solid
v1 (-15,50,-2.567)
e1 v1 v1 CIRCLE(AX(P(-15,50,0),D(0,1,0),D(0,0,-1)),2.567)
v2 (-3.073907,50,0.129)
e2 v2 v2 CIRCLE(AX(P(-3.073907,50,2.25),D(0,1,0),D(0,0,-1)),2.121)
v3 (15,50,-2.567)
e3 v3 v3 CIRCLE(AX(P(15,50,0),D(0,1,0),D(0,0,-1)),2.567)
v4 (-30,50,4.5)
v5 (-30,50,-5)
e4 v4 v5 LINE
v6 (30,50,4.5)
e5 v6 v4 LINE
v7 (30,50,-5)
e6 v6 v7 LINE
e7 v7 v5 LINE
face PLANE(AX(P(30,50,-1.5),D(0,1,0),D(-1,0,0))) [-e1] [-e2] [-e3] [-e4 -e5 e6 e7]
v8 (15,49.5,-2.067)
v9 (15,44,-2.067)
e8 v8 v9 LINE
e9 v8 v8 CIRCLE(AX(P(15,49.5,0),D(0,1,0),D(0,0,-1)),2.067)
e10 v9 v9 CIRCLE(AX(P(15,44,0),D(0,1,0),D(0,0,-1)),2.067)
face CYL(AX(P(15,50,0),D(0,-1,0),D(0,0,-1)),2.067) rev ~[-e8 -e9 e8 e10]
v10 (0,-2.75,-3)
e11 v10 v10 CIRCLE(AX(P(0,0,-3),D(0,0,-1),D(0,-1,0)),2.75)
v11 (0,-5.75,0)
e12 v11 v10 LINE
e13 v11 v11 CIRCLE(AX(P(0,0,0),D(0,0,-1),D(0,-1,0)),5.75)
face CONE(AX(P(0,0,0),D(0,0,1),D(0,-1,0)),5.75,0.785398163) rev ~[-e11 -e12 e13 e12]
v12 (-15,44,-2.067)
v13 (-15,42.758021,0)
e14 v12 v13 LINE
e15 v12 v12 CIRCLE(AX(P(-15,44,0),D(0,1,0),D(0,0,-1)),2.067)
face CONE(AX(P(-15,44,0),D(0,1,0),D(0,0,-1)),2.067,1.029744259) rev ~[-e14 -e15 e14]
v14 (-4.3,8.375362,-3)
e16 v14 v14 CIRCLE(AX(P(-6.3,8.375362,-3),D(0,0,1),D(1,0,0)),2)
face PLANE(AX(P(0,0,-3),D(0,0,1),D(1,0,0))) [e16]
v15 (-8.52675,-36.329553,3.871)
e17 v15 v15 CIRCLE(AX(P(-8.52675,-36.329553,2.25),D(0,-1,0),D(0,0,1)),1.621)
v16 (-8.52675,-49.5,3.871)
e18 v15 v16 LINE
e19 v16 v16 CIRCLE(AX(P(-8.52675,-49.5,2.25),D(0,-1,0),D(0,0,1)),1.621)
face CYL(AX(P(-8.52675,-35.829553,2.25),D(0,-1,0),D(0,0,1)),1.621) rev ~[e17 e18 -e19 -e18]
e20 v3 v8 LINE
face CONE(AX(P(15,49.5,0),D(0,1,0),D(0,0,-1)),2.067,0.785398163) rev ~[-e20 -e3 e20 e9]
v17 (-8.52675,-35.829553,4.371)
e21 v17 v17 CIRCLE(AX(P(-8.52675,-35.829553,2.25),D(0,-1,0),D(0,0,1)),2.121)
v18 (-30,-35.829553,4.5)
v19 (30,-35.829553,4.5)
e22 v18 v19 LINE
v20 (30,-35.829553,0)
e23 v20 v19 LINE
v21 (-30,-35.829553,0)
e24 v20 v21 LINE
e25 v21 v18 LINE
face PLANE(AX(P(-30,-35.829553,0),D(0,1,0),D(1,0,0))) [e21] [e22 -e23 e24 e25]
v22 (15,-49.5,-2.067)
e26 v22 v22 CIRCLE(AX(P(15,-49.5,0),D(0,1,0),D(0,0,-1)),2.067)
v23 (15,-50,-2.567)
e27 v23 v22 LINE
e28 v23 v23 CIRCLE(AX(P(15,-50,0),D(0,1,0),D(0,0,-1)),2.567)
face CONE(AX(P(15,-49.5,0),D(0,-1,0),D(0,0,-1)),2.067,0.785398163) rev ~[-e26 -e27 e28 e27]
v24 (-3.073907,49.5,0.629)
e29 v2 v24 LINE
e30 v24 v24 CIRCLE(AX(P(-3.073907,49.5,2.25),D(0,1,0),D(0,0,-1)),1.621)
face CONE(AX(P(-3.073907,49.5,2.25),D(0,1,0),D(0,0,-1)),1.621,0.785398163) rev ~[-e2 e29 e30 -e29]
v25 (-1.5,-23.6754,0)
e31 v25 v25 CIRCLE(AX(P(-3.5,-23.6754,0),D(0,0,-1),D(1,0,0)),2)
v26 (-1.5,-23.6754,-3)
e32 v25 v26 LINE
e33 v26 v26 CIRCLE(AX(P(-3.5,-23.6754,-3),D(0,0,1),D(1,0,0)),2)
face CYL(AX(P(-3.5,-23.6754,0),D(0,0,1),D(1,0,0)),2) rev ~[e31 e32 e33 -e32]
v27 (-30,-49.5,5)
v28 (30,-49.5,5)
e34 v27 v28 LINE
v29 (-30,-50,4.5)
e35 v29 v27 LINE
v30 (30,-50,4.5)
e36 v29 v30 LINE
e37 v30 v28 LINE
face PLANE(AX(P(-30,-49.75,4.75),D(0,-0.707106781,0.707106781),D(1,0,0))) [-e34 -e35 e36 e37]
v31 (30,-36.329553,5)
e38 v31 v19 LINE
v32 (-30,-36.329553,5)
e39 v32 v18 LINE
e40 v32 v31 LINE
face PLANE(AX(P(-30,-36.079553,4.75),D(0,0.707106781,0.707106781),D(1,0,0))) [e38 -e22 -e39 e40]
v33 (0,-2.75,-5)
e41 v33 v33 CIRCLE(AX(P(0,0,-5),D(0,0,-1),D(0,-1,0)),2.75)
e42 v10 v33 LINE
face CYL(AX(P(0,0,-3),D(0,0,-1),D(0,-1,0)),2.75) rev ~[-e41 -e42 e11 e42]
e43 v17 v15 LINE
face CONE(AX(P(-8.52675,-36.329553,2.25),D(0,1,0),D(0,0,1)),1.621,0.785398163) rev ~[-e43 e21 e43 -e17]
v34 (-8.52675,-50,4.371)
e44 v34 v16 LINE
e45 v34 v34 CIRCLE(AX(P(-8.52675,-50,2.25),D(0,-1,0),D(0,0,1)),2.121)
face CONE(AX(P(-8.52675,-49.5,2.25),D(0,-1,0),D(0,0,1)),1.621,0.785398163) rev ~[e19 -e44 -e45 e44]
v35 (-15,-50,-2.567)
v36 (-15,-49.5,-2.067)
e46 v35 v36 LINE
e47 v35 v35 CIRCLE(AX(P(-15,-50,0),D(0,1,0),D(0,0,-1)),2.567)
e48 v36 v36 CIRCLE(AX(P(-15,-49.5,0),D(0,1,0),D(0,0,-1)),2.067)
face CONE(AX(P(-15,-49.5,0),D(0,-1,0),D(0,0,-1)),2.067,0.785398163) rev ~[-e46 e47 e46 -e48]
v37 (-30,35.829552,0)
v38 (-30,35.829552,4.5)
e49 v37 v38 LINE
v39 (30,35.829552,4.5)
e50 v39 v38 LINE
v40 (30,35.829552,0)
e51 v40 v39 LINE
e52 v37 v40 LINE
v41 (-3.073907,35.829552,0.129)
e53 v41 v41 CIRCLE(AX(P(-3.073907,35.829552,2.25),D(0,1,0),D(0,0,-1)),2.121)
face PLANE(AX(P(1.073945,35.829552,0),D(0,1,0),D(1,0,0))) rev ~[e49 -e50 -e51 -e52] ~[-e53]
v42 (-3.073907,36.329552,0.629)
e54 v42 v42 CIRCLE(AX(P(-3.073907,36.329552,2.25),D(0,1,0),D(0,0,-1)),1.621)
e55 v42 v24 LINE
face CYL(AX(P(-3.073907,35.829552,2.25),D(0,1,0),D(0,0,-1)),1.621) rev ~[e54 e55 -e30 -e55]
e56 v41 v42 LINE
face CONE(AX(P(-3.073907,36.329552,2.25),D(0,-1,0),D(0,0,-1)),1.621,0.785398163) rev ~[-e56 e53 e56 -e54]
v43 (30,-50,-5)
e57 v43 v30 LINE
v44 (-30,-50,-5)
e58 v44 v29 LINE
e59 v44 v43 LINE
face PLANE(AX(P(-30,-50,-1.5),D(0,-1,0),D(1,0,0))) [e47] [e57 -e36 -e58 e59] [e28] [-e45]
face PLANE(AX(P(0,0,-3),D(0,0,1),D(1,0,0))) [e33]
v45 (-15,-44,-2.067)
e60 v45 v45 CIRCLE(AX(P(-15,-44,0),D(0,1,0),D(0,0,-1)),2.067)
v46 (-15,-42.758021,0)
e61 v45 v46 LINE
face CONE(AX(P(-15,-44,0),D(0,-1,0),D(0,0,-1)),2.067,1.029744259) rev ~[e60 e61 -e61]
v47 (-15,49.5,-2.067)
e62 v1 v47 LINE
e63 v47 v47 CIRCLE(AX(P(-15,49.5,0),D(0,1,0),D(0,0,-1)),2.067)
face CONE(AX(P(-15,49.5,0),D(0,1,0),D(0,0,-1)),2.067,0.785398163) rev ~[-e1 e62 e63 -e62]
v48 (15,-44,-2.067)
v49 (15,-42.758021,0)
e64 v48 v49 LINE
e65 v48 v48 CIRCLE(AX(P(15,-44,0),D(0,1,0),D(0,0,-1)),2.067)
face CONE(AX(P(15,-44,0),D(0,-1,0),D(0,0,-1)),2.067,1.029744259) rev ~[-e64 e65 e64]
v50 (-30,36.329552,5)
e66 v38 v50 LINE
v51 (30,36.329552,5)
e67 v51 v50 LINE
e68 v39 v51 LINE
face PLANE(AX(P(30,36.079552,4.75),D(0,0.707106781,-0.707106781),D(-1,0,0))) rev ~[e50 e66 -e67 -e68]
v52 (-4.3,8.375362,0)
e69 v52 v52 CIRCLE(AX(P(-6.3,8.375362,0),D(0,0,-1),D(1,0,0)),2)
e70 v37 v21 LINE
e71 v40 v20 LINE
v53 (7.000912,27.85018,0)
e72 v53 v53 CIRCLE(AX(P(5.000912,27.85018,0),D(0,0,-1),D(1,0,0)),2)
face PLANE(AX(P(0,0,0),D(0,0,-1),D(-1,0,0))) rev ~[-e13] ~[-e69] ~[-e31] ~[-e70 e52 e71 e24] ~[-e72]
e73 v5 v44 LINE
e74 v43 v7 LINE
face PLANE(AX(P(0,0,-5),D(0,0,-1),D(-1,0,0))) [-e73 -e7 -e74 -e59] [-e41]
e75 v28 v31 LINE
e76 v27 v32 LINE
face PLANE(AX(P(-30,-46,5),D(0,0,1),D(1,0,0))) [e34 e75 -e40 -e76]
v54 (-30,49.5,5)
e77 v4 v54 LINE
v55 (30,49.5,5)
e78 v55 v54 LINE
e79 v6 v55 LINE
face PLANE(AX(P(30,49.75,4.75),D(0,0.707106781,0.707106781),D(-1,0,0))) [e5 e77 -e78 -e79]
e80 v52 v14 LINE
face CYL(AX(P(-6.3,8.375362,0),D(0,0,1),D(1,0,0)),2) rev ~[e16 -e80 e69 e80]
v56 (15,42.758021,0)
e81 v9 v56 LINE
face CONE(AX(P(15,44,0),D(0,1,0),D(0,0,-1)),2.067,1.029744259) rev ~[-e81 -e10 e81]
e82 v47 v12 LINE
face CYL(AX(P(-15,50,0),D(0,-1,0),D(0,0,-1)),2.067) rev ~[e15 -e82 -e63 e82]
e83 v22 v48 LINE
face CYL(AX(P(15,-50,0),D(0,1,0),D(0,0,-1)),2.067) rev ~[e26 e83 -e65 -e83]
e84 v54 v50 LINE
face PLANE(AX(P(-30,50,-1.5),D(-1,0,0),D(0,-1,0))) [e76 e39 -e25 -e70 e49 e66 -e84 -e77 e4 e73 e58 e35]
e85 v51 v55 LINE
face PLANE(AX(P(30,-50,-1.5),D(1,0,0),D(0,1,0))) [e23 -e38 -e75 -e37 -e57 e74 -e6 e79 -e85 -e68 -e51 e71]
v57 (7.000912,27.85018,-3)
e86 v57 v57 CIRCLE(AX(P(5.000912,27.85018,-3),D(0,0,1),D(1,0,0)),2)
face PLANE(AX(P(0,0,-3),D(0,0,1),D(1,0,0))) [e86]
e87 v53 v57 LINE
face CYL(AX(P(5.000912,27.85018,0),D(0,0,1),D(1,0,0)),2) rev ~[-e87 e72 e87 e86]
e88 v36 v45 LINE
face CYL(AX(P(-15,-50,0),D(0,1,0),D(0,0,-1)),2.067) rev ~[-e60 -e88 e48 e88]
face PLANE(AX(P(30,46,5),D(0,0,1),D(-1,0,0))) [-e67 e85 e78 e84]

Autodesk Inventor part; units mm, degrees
ref_plane "YZ Plane" through (0, 0, 0) normal (1, 0, 0) x (0, 1, 0)
ref_plane "XZ Plane" through (0, 0, 0) normal (0, 1, 0) x (-1, 0, 0)
ref_plane "XY Plane" through (0, 0, 0) normal (0, 0, 1) x (1, 0, 0)
sketch "Skizze1" plane through (0, 0, 0) normal (0, 0, 1) x (1, 0, 0)
  arc A0 (-7.910725, 24.207043) -> (-7.910891, 20.407043) centre (-6.063513, 22.306962) ccw
  line L0 (-7.910725, 24.207043) -> (-4.216135, 24.206882)
  arc A1 (-4.216301, 20.406882) -> (-4.216135, 24.206882) centre (-6.063513, 22.306962) ccw
  line L1 (-4.216301, 20.406882) -> (-7.910891, 20.407043)
  spline S0 degree 3 poles (4.168227, 35.189684) (1.190462, 36.459804) (-2.249662, 35.164227) (-6.254955, 34.158153) (-11.73606, 32.147863) (-17.267484, 27.437) (-17.397864, 22.280527) (-19.179409, 11.837341) (-24.204265, -4.219772) (-21.912215, -21.361857) (-15.72629, -32.136108) (-8.960071, -34.873142) (-7.734356, -35.206805) knots 0 0 0 0 0.05534958 0.07652777 0.21178189 0.29554676 0.38296386 0.43292215 0.75488434 0.81234043 0.96723776 1 1 1 1
  spline S1 degree 3 poles (-7.734356, -35.206805) (-2.439109, -36.648242) (4.93418, -35.14496) (14.388893, -31.364077) (20.220621, -28.276552) (23.084745, -23.179223) (23.280953, -18.995872) (17.306215, -16.499664) (13.73981, -19.293705) (6.907357, -22.933236) (-1.198572, -27.162074) (-10.305482, -22.9326) (-14.035245, -10.40017) (-9.459871, -0.926027) (-6.833349, 0.315314) (-5.918232, 2.05884) (-5.936684, 4.17913) (-8.288714, 5.230646) (-8.364147, 10.437319) (-1.010592, 14.125066) (4.082108, 20.05073) (3.063503, 26.302613) (2.949283, 28.613576) (3.78883, 29.833993) (5.577793, 31.092404) (6.613193, 32.774527) (5.245759, 34.708646) (4.265654, 35.148112) (4.168227, 35.189684) knots 0 0 0 0 0.1415298 0.17035016 0.24598676 0.2589199 0.29022703 0.32626485 0.37223258 0.38897966 0.48209608 0.50825566 0.62441589 0.64741797 0.71527435 0.72606992 0.74689162 0.80172241 0.81188461 0.84851364 0.9163561 0.94337427 0.94821885 0.96295932 0.96650966 0.98187972 0.99818797 1 1 1 1
  line L2 (-4.216301, 20.406882) -> (-7.910891, 20.407043)
  arc A2 (-4.216301, 20.406882) -> (-4.216135, 24.206882) centre (-6.063513, 22.306962) ccw
  line L3 (-7.910725, 24.207043) -> (-4.216135, 24.206882)
  arc A3 (-7.910725, 24.207043) -> (-7.910891, 20.407043) centre (-6.063513, 22.306962) ccw
  line L4 (-22.994876, 35.829551) -> (22.994876, 35.829551) construction
  line L5 (22.994876, 35.829551) -> (22.994876, -35.829551) construction
  line L6 (22.994876, -35.829551) -> (-22.994876, -35.829551) construction
  line L7 (-22.994876, -35.829551) -> (-22.994876, 35.829551) construction
  line L8 (-22.994876, 35.829551) -> (22.994876, -35.829551) construction
  line L9 (-22.994876, -35.829551) -> (22.994876, 35.829551) construction
  circle A4 centre (3.874552, -36.279551) radius 1.25 construction
  line L10 (1.214575, -35.829551) -> (11.587679, -35.829551) construction
  line L11 (3.874552, -36.279551) -> (3.874552, -35.029551) construction
  circle A5 centre (4.795469, 36.279551) radius 1.25 construction
  line L12 (4.795469, 36.279551) -> (4.795469, 35.029551) construction
  line L13 (3.124047, 35.829551) -> (12.547009, 35.829551) construction
  point P0 (0, 0)
  point P1 (0, 0)
  point P2 (0, 0)
  dimension "d88" = 2.5
  dimension "d91" = 2.5
  dimension "d89" = 0.8
  dimension "d92" = 0.8
sketch "Skizze9" plane through (0, 0, 0) normal (0, 0, 1) x (1, 0, 0)
  line L0 (-30, 46) -> (30, 46)
  line L1 (30, 46) -> (30, -46)
  line L2 (30, -46) -> (-30, -46)
  line L3 (-30, 46) -> (30, -46) construction
  line L4 (30, 46) -> (-30, -46) construction
  spline S0 degree 3 poles (4.168227, 35.189684) (1.190462, 36.459804) (-2.249662, 35.164227) (-6.254955, 34.158153) (-11.73606, 32.147863) (-17.267484, 27.437) (-17.397864, 22.280527) (-19.179409, 11.837341) (-24.204265, -4.219772) (-21.912215, -21.361857) (-15.72629, -32.136108) (-8.960071, -34.873142) (-7.734356, -35.206805) knots 0 0 0 0 0.05534958 0.07652777 0.21178189 0.29554676 0.38296386 0.43292215 0.75488434 0.81234043 0.96723776 1 1 1 1
  spline S1 degree 3 poles (-7.734356, -35.206805) (-2.439109, -36.648242) (4.93418, -35.14496) (14.388893, -31.364077) (20.220621, -28.276552) (23.084745, -23.179223) (23.280953, -18.995872) (17.306215, -16.499664) (13.73981, -19.293705) (6.907357, -22.933236) (-1.198572, -27.162074) (-10.305482, -22.9326) (-14.035245, -10.40017) (-9.459871, -0.926027) (-6.833349, 0.315314) (-5.918232, 2.05884) (-5.936684, 4.17913) (-8.288714, 5.230646) (-8.364147, 10.437319) (-1.010592, 14.125066) (4.082108, 20.05073) (3.063503, 26.302613) (2.949283, 28.613576) (3.78883, 29.833993) (5.577793, 31.092404) (6.613193, 32.774527) (5.245759, 34.708646) (4.265654, 35.148112) (4.168227, 35.189684) knots 0 0 0 0 0.1415298 0.17035016 0.24598676 0.2589199 0.29022703 0.32626485 0.37223258 0.38897966 0.48209608 0.50825566 0.62441589 0.64741797 0.71527435 0.72606992 0.74689162 0.80172241 0.81188461 0.84851364 0.9163561 0.94337427 0.94821885 0.96295932 0.96650966 0.98187972 0.99818797 1 1 1 1
  circle A0 centre (-3.5, -23.6754) radius 2
  circle A1 centre (5.000912, 27.85018) radius 2
  circle A2 centre (-6.3, 8.375362) radius 2
  line L5 (-30, -35.829553) -> (30, -35.829553)
  line L6 (-30, -46) -> (-30, 46)
  line L7 (-30, 35.829552) -> (30, 35.829552)
  point P0 (0, 0)
  point P1 (-2.781906, -35.829553)
  point P2 (1.073951, 35.829552)
  dimension "Laenge_aussen" = 105
  dimension "d68" = 60
  dimension "d69" = 92
  dimension "d180" = 4
  dimension "d182" = 4
  dimension "d183" = 4
  dimension "d184" = 33.5
  dimension "d186" = 24.99909
  dimension "d221" = 36.3
extrude "Extrusion3" add sketch "Skizze9" along normal blind 5 contours L0 L1 L7 L6 | L5 L1 L2 L6
sketch "Skizze11" plane through (0, 0, 0) normal (0, 0, -1) x (-1, 0, 0)
  line L0 (30, -46) -> (-30, -46) projected
  line L1 (30, 46) -> (30, -46) projected
  line L2 (-30, -46) -> (30, -46)
  line L3 (30, -46) -> (30, 46)
  line L4 (30, 46) -> (-30, 46)
  line L5 (-30, 46) -> (-30, -46)
  point P0 (0, 0)
extrude "Extrusion4" add sketch "Skizze11" along normal blind 1.5
chamfer "Fasen2" distance 0.5 angle 45 2 edges at (0, -35.8296, 5) (0, 35.8296, 5)
sketch "Skizze15" plane through (-30, 46, 5) normal (0, 1, 0) x (1, 0, 0)
  line L0 (60, 0) -> (0, 0) projected
  line L1 (0, 6.5) -> (60, 6.5) projected
  line L2 (60, 0) -> (0, 0)
  line L3 (0, 0) -> (0, 6.5)
  line L4 (0, 6.5) -> (60, 6.5)
  line L5 (60, 6.5) -> (60, 0)
  point P0 (30, 5)
extrude "Extrusion6" add sketch "Skizze15" along normal blind 4
sketch "Skizze16" plane through (-30, -46, 5) normal (0, -1, 0) x (1, 0, 0)
  line L0 (0, -6.5) -> (0, 0) projected
  line L1 (60, -6.5) -> (0, -6.5) projected
  line L2 (0, 0) -> (60, 0)
  line L3 (60, 0) -> (60, -6.5)
  line L4 (60, -6.5) -> (0, -6.5)
  line L5 (0, -6.5) -> (0, 0)
  point P0 (30, -5)
extrude "Extrusion7" add sketch "Skizze16" along normal blind 4
sketch "Skizze17" plane through (0, 0, -1.5) normal (0, 0, -1) x (-1, 0, 0)
  line L0 (30, 50) -> (30, -50) projected
  line L1 (-30, 50) -> (30, 50) projected
  line L2 (-30, -50) -> (-30, 50) projected
  line L3 (30, -50) -> (-30, -50) projected
  point P0 (0, 0)
extrude "Extrusion8" add sketch "Skizze17" along normal blind 3.5
chamfer "Fasen4" distance 0.5 angle 45 2 edges at (0, 50, 5) (0, -50, 5)
sketch "Skizze20" plane through (0, 0, 0) normal (0, 0, 1) x (1, 0, 0)
  line L0 (-30, -50) -> (30, -50)
  line L1 (30, 35.829552) -> (30, -35.829553)
  point P0 (0, 0)
  point P1 (-30, -46.5)
  point P2 (0, 0)
hole "Bohrung10" at (0, 0, 0) direction (0, 0, -1) diameter 5.5 end through all countersink diameter 11.5 countersink angle 90
sketch "Skizze21" plane through (-30, -50, 5) normal (0, -1, 0) x (1, 0, 0)
  line L0 (60, -10) -> (0, -10) projected
  line L1 (60, 0) -> (0, 0) projected
  line L2 (60, -0.5) -> (60, -10) projected
  line L3 (0, -0.5) -> (0, -10) projected
  point P0 (30, -5)
  point P1 (15, -5)
  point P2 (45, -5)
  point P3 (60, -5.25)
  dimension "d161" = 10
  dimension "d163" = 60
  dimension "d164" = 15
  dimension "d165" = 15
  dimension "d179" = 5
hole "Bohrung11" at (15, -50, 0) at (-15, -50, 0) direction (0, 1, 0) diameter 4.134 depth 6 tip angle 118 thread size "M5x0.8" class "6H" standard "ISO Metric profile"
chamfer "Fasen5" distance 0.5 angle 45 2 edges at (-15, -50, 2.067) (15, -50, 2.067)
mirror "Spiegeln4" about plane through (0, 0, 0) normal (0, 1, 0) of "Bohrung11"
chamfer "Fasen6" distance 0.5 angle 45 2 edges at (15, 50, 2.067) (-15, 50, 2.067)
sketch "Skizze22" plane through (0, 0, 0) normal (0, 0, 1) x (1, 0, 0)
  circle A0 centre (-8.52675, -36.279553) radius 1.25 construction
  line L0 (30, -35.829553) -> (-30, -35.829553) construction
  line L1 (-19.029206, -35.029553) -> (-13.234121, -35.029553) construction
  spline S0 degree 3 poles (4.168227, 35.189684) (1.190462, 36.459804) (-2.249662, 35.164227) (-6.254955, 34.158153) (-11.73606, 32.147863) (-17.267484, 27.437) (-17.397864, 22.280527) (-19.179409, 11.837341) (-24.204265, -4.219772) (-21.912215, -21.361857) (-15.72629, -32.136108) (-8.960071, -34.873142) (-7.734356, -35.206805) knots 0 0 0 0 0.05534958 0.07652777 0.21178189 0.29554676 0.38296386 0.43292215 0.75488434 0.81234043 0.96723776 1 1 1 1 construction
  circle A1 centre (-3.073907, 36.279552) radius 1.25 construction
  line L2 (-18.70543, 35.029552) -> (-14.396256, 35.029552) construction
  line L3 (-30, 35.829552) -> (30, 35.829552) construction
  point P0 (0, 0)
  dimension "d188" = 2.5
  dimension "d189" = 0.8
  dimension "d190" = 2.5
  dimension "d191" = 0.8
sketch "Skizze23" plane through (-30, -35.829553, 0) normal (0, 1, 0) x (1, 0, 0)
  line L0 (20.22325, 0) -> (22.72325, 0) construction
  line L1 (0, -5) -> (60, -5)
  line L2 (60, -4.5) -> (0, -4.5)
  line L3 (60, 0) -> (0, 0)
  point P0 (30, 0)
  point P1 (21.47325, -2.25)
  point P2 (21.47325, 0)
  dimension "d218" = 4.5
  dimension "d219" = 2.25
hole "Bohrung12" at (-8.52675, -35.829553, 2.25) direction (0, -1, 0) diameter 3.242 end through all thread size "M4x0.7" class "6H" standard "ISO Metric profile"
chamfer "Fasen7" distance 0.5 angle 45 2 edges at (-8.5267, -35.8296, 0.629) (-8.5267, -50, 0.629)
sketch "Skizze24" plane through (-30, 35.829552, 0) normal (0, -1, 0) x (1, 0, 0)
  line L0 (28.176093, 0) -> (25.676093, 0) construction
  line L1 (60, 5) -> (0, 5)
  line L2 (0, 0) -> (60, 0)
  line L3 (0, 4.5) -> (60, 4.5)
  point P0 (30, 0)
  point P1 (26.926093, 2.25)
  point P2 (26.926093, 0)
  dimension "d205" = 2.25
  dimension "d220" = 4.5
hole "Bohrung13" at (-3.073907, 35.829552, 2.25) direction (0, 1, 0) diameter 3.242 end through all thread size "M4x0.7" class "6H" standard "ISO Metric profile"
chamfer "Fasen8" distance 0.5 angle 45 2 edges at (-3.0739, 35.8296, 3.871) (-3.0739, 50, 3.871)
extrude "Extrusion10" cut sketch "Skizze9" against normal blind 3 contours A0 | A2 | A1
equation "\"d91\" = Kugeldurchmesser"
equation "\"d89\" = Kugelhoehe"
equation "\"d92\" = Kugelhoehe"
equation "\"Laenge_aussen\" = Laenge_innen + 2 * Wanddicke"
equation "\"d68\" = Breite_innen"
equation "\"d191\" = d189"
equation "\"Breite_innen\" = 60"
equation "\"Laenge_innen\" = 85"
equation "\"Absatz\" = 2"
equation "\"Kugeldurchmesser\" = 2.5"
equation "\"Kugelhoehe\" = 0.8"
equation "\"Anbindung_Kolben\" = 15"
equation "\"Wanddicke\" = 10"
properties part number "TS_V1_Fallmagazin_Wandung_int"
